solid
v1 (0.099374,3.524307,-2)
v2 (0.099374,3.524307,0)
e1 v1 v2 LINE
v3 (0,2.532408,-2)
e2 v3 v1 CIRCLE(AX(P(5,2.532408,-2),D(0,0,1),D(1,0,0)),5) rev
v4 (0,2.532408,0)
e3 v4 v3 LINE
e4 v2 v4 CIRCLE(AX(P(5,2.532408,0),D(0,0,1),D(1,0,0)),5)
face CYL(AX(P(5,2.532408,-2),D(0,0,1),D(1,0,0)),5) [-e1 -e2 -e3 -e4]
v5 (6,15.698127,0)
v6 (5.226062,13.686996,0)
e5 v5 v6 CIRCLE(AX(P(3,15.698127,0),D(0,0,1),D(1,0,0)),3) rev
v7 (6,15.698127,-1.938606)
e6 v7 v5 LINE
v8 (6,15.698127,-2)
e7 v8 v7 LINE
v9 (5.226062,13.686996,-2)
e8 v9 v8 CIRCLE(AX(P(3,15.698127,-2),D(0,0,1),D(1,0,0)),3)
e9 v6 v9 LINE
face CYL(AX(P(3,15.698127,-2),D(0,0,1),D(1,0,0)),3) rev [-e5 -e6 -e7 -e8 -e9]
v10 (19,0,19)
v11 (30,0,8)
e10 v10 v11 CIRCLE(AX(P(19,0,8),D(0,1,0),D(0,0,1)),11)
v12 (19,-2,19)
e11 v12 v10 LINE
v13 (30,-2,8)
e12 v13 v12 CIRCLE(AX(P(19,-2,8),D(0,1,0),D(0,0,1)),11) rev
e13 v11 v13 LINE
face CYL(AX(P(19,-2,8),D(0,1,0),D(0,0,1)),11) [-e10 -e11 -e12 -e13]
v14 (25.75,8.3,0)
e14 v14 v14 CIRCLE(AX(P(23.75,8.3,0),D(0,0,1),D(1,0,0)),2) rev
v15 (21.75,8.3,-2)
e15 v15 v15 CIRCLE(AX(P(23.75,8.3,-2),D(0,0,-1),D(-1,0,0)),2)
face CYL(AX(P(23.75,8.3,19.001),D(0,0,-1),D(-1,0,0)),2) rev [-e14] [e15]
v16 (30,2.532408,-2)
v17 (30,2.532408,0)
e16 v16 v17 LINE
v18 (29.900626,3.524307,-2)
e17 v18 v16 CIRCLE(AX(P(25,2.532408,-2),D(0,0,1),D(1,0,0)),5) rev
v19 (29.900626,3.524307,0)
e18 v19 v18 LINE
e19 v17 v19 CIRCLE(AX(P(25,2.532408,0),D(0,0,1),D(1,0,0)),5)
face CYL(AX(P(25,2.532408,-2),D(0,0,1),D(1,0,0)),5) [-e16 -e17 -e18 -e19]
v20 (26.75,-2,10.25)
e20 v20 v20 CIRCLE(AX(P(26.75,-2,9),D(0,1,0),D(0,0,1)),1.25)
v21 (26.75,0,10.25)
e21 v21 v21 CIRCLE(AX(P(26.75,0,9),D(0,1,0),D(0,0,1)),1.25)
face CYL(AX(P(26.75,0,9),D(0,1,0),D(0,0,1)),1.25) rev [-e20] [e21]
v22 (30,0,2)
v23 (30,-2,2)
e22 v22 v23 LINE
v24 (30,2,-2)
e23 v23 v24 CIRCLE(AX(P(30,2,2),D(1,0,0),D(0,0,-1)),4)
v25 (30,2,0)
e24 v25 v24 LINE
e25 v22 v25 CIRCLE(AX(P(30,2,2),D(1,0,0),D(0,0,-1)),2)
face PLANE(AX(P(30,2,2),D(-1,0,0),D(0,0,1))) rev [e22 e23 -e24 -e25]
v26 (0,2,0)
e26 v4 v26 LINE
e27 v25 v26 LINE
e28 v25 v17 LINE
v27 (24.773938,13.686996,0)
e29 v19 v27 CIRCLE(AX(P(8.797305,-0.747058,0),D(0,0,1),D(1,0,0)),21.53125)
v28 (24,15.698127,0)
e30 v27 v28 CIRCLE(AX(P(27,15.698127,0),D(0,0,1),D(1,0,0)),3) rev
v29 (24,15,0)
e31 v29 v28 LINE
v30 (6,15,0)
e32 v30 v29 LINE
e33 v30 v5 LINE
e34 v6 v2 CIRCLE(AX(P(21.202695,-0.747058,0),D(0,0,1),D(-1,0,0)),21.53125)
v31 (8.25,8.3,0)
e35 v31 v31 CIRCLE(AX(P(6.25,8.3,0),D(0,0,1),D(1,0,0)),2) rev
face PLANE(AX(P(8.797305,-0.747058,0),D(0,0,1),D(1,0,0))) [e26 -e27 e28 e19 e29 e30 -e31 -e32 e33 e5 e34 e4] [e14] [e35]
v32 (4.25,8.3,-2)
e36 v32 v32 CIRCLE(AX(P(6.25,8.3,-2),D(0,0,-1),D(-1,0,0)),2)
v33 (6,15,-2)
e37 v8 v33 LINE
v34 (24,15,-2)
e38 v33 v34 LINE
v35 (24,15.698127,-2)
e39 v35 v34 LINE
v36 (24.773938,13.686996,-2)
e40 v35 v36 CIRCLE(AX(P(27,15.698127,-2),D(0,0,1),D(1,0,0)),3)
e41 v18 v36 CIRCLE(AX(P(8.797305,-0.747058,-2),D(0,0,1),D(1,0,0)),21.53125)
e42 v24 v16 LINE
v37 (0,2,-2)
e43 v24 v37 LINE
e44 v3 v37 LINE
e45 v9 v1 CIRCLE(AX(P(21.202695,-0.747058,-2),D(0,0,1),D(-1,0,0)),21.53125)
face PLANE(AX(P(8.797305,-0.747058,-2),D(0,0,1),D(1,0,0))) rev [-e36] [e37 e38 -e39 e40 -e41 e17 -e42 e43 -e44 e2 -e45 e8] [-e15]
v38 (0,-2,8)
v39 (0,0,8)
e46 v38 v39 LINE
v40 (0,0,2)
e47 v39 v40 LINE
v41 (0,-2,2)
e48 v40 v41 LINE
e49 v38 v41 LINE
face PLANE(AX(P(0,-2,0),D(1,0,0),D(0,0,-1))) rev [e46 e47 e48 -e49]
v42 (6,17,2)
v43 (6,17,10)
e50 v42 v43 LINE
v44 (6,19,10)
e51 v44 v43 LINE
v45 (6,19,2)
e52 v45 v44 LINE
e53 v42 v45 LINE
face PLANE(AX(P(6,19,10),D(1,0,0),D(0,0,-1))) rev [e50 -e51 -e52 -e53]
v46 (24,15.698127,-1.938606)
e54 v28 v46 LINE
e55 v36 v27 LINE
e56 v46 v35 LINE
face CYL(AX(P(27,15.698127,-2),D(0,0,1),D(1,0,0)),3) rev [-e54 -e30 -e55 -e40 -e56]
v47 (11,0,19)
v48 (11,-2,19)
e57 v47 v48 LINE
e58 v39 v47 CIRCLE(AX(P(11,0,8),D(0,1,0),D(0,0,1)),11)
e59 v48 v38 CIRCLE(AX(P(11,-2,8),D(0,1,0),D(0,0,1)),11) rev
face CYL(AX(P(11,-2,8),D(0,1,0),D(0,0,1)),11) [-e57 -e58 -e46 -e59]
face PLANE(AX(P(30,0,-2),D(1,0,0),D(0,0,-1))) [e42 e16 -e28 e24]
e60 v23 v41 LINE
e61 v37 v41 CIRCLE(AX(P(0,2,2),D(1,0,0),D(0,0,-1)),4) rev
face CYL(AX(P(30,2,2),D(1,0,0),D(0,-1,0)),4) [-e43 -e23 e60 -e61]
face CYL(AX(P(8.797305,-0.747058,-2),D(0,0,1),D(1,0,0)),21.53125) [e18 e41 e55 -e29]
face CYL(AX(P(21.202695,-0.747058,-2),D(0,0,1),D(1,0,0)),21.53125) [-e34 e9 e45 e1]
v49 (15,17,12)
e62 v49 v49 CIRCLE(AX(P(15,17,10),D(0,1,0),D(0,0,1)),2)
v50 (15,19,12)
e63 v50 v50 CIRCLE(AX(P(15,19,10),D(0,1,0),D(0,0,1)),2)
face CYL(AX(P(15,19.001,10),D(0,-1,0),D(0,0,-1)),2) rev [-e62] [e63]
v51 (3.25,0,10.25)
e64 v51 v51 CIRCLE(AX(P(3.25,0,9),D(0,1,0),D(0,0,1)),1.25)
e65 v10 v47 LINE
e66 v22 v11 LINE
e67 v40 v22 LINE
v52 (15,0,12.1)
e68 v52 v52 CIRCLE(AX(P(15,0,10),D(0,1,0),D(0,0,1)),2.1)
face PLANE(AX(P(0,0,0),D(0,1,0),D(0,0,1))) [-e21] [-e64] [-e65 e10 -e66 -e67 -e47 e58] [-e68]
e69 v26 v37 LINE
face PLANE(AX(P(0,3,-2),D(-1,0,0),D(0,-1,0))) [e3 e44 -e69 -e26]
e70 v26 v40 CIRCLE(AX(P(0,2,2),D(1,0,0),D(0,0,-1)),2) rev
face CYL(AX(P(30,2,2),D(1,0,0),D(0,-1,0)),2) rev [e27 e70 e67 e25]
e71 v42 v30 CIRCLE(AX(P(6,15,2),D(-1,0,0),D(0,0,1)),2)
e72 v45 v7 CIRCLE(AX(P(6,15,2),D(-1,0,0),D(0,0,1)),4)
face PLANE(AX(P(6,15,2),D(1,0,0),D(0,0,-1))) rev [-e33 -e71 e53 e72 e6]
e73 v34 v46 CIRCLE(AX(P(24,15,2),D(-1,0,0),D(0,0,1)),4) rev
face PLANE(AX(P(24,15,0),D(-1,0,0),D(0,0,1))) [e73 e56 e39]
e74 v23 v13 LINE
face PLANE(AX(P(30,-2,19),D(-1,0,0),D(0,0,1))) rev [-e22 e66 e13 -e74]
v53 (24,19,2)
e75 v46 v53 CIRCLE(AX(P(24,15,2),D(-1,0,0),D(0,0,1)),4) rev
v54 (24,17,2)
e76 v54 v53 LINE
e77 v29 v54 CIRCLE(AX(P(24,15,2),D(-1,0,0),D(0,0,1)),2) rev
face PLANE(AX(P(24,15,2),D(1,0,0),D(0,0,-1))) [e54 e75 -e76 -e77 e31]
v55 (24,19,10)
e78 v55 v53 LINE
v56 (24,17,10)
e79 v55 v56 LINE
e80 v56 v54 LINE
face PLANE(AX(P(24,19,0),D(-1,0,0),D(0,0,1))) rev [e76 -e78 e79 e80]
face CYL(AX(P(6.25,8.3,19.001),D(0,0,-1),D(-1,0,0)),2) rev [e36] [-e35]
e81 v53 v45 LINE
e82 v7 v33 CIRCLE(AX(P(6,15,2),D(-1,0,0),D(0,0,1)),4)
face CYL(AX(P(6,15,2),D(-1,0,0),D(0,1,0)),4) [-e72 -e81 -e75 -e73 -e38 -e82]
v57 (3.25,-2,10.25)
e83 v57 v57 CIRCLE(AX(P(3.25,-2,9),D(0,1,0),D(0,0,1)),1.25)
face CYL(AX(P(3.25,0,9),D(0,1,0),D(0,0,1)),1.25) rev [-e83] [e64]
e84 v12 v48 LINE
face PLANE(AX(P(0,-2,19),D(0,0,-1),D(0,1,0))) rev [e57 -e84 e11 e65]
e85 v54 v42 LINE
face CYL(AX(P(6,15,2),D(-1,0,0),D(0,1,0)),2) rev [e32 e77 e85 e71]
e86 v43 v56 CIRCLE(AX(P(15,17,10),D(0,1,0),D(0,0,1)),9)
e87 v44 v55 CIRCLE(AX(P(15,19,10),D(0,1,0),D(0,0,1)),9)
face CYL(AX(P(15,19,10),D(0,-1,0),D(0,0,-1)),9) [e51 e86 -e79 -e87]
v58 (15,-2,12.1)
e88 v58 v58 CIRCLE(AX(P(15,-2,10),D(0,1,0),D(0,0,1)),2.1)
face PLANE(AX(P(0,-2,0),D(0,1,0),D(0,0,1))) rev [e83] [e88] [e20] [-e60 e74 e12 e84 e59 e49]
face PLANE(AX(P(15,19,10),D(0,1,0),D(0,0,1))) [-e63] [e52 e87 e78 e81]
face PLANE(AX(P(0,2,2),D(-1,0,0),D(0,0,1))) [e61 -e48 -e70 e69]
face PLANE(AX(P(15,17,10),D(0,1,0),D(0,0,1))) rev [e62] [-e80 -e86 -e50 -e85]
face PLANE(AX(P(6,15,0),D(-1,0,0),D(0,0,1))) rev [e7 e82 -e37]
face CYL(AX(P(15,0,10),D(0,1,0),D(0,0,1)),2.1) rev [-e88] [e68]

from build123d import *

# Parameters (mm, degrees)
BRIDA_BASE1_DEPTH                = 2
REDONDEO5MM_R                    = 5
REDONDEO3MM_R                    = 3
BRIDA_DE_ARISTA1_STRIP_W         = 12
BRIDA_DE_ARISTA1_STRIP_H         = 2
BRIDA_DE_ARISTA1_STRIP_CUT_DEPTH = 30
BRIDA_DE_ARISTA1_DEPTH           = 30
BRIDA_DE_ARISTA2_STRIP_W         = 12
BRIDA_DE_ARISTA2_STRIP_H         = 2
BRIDA_DE_ARISTA2_STRIP_CUT_DEPTH = 18
BRIDA_DE_ARISTA2_DEPTH           = 18
BRIDA_START                      = 2
BRIDA_DE_ARISTA2_FLAT_DEPTH      = 2
CORTAR_EXTRUIR6_REACH            = 43.255
CROQUIS26_R                      = 2
REDONDEO11MM_R                   = 11
TALADRO_ROSCADO_M32_D            = 2.5
TALADRO_ROSCADO_M32_DEPTH        = 20.65
TALADRO_ROSCADO_M32_TIP          = 0.751075774
TALADRO_ROSCADO_M52_D            = 4.2
TALADRO_ROSCADO_M52_DEPTH        = 2
CORTAR_EXTRUIR7_REACH            = 42.274
CROQUIS36_R                      = 2


# Sheet-metal steps are written as plain solids
with BuildPart() as part:
    # Croquis1 → Brida base1 (new body)
    with BuildSketch(Plane.XY):
        with BuildLine():
            Line((0, 0), (30, 0))
            Line((30, 0), (30, 3))
            ThreePointArc((30, 3), (27.886584846, 9.212566007), (24, 14.5))
            Line((24, 14.5), (24, 17))
            Line((24, 17), (6, 17))
            Line((6, 17), (6, 14.5))
            ThreePointArc((6, 14.5), (2.113415154, 9.212566007), (0, 3))
            Line((0, 3), (0, 0))
        make_face()
    extrude(amount=-BRIDA_BASE1_DEPTH)

    # Redondeo5mm
    redondeo5mm_edges = [part.edges().sort_by_distance(p)[0] for p in [
        (0, 3, -1),
        (30, 3, -1),
    ]]
    fillet(redondeo5mm_edges, radius=REDONDEO5MM_R)

    # Redondeo3mm
    redondeo3mm_edges = [part.edges().sort_by_distance(p)[0] for p in [
        (6, 14.5, -1),
        (24, 14.5, -1),
    ]]
    fillet(redondeo3mm_edges, radius=REDONDEO3MM_R)

    # Brida de arista1 strip (across the edge) → Brida de arista1 strip cut (cut)
    with BuildSketch(Plane.YZ):
        with Locations((-4, -1)):
            Rectangle(BRIDA_DE_ARISTA1_STRIP_W, BRIDA_DE_ARISTA1_STRIP_H)
    extrude(amount=BRIDA_DE_ARISTA1_STRIP_CUT_DEPTH, mode=Mode.SUBTRACT)

    # Brida de arista1 section (across the edge) → Brida de arista1 (add)
    with BuildSketch(Plane.YZ):
        with BuildLine():
            Line((-2, 2), (-2, 19))
            Line((-2, 19), (0, 19))
            Line((0, 19), (0, 2))
            ThreePointArc((0, 2), (0.585786438, 0.585786438), (2, 0))
            Line((2, 0), (2, -2))
            ThreePointArc((2, -2), (-0.828427125, -0.828427125), (-2, 2))
        make_face()
    extrude(amount=BRIDA_DE_ARISTA1_DEPTH)

    # Brida de arista2 strip (across the edge) → Brida de arista2 strip cut (cut)
    with BuildSketch(Plane(origin=(24, 17, 0), x_dir=(0, -1, 0), z_dir=(-1, 0, 0))):
        with Locations((-4, -1)):
            Rectangle(BRIDA_DE_ARISTA2_STRIP_W, BRIDA_DE_ARISTA2_STRIP_H)
    extrude(amount=BRIDA_DE_ARISTA2_STRIP_CUT_DEPTH, mode=Mode.SUBTRACT)

    # Brida de arista2 bend section (across the edge) → Brida de arista2 (add)
    with BuildSketch(Plane(origin=(24, 17, 0), x_dir=(0, -1, 0), z_dir=(-1, 0, 0))):
        with BuildLine():
            Line((-2, 2), (0, 2))
            ThreePointArc((0, 2), (0.585786438, 0.585786438), (2, 0))
            Line((2, 0), (2, -2))
            ThreePointArc((2, -2), (-0.828427125, -0.828427125), (-2, 2))
        make_face()
    extrude(amount=BRIDA_DE_ARISTA2_DEPTH)

    # Brida de arista2 profile (on flange) → Brida de arista2 flat (add)
    with BuildSketch(Plane(origin=(0, 17, 0), x_dir=(-1, 0, 0), z_dir=(0, 1, 0)).offset(BRIDA_START)):
        with BuildLine():
            ThreePointArc((-6, 10), (-15, 19), (-24, 10))
            Line((-24, 10), (-24, 2))
            Line((-24, 2), (-6, 2))
            Line((-6, 2), (-6, 10))
        make_face()
    extrude(amount=-BRIDA_DE_ARISTA2_FLAT_DEPTH)

    # Croquis26 → Cortar-Extruir6 (cut, up to next)
    with BuildSketch(Plane(origin=(0, 0, -2), x_dir=(-1, 0, 0), z_dir=(0, 0, -1)), mode=Mode.PRIVATE) as cortar_extruir6_sk1:
        with Locations((-6.25, 8.3)):
            Circle(CROQUIS26_R)
    cortar_extruir6_tool1 = extrude(cortar_extruir6_sk1.sketch, amount=-CORTAR_EXTRUIR6_REACH, mode=Mode.PRIVATE) & part.part
    # Croquis26 → Cortar-Extruir6 (cut, up to next)
    with BuildSketch(Plane(origin=(0, 0, -2), x_dir=(-1, 0, 0), z_dir=(0, 0, -1)), mode=Mode.PRIVATE) as cortar_extruir6_sk2:
        with Locations((-23.75, 8.3)):
            Circle(CROQUIS26_R)
    cortar_extruir6_tool2 = extrude(cortar_extruir6_sk2.sketch, amount=-CORTAR_EXTRUIR6_REACH, mode=Mode.PRIVATE) & part.part
    add(cortar_extruir6_tool1.solids().sort_by_distance((6.25, 8.3, -2))[0], mode=Mode.SUBTRACT)
    add(cortar_extruir6_tool2.solids().sort_by_distance((23.75, 8.3, -2))[0], mode=Mode.SUBTRACT)

    # Redondeo11mm
    redondeo11mm_edges = [part.edges().sort_by_distance(p)[0] for p in [
        (0, -1, 19),
        (30, -1, 19),
    ]]
    fillet(redondeo11mm_edges, radius=REDONDEO11MM_R)

    # Taladro roscado M32
    with Locations(Plane(origin=(0, 0, 0), x_dir=(1, 0, 0), z_dir=(0, 1, 0))):
        with Locations((3.25, -9), (26.75, -9)):
            Hole(TALADRO_ROSCADO_M32_D / 2, depth=TALADRO_ROSCADO_M32_DEPTH)
            with Locations((0, 0, -(TALADRO_ROSCADO_M32_DEPTH + TALADRO_ROSCADO_M32_TIP / 2))):  # 118° drill point
                Cone(0, TALADRO_ROSCADO_M32_D / 2, TALADRO_ROSCADO_M32_TIP, mode=Mode.SUBTRACT)

    # Taladro roscado M52
    with Locations(Plane(origin=(3.715500562, 0, 2.638137214), x_dir=(1, 0, 0), z_dir=(0, 1, 0))):
        with Locations((11.284499438, -7.361862786)):
            Hole(TALADRO_ROSCADO_M52_D / 2, depth=TALADRO_ROSCADO_M52_DEPTH)

    # Croquis36 → Cortar-Extruir7 (cut, up to next)
    with BuildSketch(Plane(origin=(0, 17, 0), x_dir=(1, 0, 0), z_dir=(0, 1, 0)), mode=Mode.PRIVATE) as cortar_extruir7_sk1:
        with Locations(Location((15, -10, 0), (0, 0, 270))):
            Circle(CROQUIS36_R)
    cortar_extruir7_tool1 = extrude(cortar_extruir7_sk1.sketch, amount=CORTAR_EXTRUIR7_REACH, mode=Mode.PRIVATE) & part.part
    add(cortar_extruir7_tool1.solids().sort_by_distance((15, 17, 10))[0], mode=Mode.SUBTRACT)


solid = part.part
